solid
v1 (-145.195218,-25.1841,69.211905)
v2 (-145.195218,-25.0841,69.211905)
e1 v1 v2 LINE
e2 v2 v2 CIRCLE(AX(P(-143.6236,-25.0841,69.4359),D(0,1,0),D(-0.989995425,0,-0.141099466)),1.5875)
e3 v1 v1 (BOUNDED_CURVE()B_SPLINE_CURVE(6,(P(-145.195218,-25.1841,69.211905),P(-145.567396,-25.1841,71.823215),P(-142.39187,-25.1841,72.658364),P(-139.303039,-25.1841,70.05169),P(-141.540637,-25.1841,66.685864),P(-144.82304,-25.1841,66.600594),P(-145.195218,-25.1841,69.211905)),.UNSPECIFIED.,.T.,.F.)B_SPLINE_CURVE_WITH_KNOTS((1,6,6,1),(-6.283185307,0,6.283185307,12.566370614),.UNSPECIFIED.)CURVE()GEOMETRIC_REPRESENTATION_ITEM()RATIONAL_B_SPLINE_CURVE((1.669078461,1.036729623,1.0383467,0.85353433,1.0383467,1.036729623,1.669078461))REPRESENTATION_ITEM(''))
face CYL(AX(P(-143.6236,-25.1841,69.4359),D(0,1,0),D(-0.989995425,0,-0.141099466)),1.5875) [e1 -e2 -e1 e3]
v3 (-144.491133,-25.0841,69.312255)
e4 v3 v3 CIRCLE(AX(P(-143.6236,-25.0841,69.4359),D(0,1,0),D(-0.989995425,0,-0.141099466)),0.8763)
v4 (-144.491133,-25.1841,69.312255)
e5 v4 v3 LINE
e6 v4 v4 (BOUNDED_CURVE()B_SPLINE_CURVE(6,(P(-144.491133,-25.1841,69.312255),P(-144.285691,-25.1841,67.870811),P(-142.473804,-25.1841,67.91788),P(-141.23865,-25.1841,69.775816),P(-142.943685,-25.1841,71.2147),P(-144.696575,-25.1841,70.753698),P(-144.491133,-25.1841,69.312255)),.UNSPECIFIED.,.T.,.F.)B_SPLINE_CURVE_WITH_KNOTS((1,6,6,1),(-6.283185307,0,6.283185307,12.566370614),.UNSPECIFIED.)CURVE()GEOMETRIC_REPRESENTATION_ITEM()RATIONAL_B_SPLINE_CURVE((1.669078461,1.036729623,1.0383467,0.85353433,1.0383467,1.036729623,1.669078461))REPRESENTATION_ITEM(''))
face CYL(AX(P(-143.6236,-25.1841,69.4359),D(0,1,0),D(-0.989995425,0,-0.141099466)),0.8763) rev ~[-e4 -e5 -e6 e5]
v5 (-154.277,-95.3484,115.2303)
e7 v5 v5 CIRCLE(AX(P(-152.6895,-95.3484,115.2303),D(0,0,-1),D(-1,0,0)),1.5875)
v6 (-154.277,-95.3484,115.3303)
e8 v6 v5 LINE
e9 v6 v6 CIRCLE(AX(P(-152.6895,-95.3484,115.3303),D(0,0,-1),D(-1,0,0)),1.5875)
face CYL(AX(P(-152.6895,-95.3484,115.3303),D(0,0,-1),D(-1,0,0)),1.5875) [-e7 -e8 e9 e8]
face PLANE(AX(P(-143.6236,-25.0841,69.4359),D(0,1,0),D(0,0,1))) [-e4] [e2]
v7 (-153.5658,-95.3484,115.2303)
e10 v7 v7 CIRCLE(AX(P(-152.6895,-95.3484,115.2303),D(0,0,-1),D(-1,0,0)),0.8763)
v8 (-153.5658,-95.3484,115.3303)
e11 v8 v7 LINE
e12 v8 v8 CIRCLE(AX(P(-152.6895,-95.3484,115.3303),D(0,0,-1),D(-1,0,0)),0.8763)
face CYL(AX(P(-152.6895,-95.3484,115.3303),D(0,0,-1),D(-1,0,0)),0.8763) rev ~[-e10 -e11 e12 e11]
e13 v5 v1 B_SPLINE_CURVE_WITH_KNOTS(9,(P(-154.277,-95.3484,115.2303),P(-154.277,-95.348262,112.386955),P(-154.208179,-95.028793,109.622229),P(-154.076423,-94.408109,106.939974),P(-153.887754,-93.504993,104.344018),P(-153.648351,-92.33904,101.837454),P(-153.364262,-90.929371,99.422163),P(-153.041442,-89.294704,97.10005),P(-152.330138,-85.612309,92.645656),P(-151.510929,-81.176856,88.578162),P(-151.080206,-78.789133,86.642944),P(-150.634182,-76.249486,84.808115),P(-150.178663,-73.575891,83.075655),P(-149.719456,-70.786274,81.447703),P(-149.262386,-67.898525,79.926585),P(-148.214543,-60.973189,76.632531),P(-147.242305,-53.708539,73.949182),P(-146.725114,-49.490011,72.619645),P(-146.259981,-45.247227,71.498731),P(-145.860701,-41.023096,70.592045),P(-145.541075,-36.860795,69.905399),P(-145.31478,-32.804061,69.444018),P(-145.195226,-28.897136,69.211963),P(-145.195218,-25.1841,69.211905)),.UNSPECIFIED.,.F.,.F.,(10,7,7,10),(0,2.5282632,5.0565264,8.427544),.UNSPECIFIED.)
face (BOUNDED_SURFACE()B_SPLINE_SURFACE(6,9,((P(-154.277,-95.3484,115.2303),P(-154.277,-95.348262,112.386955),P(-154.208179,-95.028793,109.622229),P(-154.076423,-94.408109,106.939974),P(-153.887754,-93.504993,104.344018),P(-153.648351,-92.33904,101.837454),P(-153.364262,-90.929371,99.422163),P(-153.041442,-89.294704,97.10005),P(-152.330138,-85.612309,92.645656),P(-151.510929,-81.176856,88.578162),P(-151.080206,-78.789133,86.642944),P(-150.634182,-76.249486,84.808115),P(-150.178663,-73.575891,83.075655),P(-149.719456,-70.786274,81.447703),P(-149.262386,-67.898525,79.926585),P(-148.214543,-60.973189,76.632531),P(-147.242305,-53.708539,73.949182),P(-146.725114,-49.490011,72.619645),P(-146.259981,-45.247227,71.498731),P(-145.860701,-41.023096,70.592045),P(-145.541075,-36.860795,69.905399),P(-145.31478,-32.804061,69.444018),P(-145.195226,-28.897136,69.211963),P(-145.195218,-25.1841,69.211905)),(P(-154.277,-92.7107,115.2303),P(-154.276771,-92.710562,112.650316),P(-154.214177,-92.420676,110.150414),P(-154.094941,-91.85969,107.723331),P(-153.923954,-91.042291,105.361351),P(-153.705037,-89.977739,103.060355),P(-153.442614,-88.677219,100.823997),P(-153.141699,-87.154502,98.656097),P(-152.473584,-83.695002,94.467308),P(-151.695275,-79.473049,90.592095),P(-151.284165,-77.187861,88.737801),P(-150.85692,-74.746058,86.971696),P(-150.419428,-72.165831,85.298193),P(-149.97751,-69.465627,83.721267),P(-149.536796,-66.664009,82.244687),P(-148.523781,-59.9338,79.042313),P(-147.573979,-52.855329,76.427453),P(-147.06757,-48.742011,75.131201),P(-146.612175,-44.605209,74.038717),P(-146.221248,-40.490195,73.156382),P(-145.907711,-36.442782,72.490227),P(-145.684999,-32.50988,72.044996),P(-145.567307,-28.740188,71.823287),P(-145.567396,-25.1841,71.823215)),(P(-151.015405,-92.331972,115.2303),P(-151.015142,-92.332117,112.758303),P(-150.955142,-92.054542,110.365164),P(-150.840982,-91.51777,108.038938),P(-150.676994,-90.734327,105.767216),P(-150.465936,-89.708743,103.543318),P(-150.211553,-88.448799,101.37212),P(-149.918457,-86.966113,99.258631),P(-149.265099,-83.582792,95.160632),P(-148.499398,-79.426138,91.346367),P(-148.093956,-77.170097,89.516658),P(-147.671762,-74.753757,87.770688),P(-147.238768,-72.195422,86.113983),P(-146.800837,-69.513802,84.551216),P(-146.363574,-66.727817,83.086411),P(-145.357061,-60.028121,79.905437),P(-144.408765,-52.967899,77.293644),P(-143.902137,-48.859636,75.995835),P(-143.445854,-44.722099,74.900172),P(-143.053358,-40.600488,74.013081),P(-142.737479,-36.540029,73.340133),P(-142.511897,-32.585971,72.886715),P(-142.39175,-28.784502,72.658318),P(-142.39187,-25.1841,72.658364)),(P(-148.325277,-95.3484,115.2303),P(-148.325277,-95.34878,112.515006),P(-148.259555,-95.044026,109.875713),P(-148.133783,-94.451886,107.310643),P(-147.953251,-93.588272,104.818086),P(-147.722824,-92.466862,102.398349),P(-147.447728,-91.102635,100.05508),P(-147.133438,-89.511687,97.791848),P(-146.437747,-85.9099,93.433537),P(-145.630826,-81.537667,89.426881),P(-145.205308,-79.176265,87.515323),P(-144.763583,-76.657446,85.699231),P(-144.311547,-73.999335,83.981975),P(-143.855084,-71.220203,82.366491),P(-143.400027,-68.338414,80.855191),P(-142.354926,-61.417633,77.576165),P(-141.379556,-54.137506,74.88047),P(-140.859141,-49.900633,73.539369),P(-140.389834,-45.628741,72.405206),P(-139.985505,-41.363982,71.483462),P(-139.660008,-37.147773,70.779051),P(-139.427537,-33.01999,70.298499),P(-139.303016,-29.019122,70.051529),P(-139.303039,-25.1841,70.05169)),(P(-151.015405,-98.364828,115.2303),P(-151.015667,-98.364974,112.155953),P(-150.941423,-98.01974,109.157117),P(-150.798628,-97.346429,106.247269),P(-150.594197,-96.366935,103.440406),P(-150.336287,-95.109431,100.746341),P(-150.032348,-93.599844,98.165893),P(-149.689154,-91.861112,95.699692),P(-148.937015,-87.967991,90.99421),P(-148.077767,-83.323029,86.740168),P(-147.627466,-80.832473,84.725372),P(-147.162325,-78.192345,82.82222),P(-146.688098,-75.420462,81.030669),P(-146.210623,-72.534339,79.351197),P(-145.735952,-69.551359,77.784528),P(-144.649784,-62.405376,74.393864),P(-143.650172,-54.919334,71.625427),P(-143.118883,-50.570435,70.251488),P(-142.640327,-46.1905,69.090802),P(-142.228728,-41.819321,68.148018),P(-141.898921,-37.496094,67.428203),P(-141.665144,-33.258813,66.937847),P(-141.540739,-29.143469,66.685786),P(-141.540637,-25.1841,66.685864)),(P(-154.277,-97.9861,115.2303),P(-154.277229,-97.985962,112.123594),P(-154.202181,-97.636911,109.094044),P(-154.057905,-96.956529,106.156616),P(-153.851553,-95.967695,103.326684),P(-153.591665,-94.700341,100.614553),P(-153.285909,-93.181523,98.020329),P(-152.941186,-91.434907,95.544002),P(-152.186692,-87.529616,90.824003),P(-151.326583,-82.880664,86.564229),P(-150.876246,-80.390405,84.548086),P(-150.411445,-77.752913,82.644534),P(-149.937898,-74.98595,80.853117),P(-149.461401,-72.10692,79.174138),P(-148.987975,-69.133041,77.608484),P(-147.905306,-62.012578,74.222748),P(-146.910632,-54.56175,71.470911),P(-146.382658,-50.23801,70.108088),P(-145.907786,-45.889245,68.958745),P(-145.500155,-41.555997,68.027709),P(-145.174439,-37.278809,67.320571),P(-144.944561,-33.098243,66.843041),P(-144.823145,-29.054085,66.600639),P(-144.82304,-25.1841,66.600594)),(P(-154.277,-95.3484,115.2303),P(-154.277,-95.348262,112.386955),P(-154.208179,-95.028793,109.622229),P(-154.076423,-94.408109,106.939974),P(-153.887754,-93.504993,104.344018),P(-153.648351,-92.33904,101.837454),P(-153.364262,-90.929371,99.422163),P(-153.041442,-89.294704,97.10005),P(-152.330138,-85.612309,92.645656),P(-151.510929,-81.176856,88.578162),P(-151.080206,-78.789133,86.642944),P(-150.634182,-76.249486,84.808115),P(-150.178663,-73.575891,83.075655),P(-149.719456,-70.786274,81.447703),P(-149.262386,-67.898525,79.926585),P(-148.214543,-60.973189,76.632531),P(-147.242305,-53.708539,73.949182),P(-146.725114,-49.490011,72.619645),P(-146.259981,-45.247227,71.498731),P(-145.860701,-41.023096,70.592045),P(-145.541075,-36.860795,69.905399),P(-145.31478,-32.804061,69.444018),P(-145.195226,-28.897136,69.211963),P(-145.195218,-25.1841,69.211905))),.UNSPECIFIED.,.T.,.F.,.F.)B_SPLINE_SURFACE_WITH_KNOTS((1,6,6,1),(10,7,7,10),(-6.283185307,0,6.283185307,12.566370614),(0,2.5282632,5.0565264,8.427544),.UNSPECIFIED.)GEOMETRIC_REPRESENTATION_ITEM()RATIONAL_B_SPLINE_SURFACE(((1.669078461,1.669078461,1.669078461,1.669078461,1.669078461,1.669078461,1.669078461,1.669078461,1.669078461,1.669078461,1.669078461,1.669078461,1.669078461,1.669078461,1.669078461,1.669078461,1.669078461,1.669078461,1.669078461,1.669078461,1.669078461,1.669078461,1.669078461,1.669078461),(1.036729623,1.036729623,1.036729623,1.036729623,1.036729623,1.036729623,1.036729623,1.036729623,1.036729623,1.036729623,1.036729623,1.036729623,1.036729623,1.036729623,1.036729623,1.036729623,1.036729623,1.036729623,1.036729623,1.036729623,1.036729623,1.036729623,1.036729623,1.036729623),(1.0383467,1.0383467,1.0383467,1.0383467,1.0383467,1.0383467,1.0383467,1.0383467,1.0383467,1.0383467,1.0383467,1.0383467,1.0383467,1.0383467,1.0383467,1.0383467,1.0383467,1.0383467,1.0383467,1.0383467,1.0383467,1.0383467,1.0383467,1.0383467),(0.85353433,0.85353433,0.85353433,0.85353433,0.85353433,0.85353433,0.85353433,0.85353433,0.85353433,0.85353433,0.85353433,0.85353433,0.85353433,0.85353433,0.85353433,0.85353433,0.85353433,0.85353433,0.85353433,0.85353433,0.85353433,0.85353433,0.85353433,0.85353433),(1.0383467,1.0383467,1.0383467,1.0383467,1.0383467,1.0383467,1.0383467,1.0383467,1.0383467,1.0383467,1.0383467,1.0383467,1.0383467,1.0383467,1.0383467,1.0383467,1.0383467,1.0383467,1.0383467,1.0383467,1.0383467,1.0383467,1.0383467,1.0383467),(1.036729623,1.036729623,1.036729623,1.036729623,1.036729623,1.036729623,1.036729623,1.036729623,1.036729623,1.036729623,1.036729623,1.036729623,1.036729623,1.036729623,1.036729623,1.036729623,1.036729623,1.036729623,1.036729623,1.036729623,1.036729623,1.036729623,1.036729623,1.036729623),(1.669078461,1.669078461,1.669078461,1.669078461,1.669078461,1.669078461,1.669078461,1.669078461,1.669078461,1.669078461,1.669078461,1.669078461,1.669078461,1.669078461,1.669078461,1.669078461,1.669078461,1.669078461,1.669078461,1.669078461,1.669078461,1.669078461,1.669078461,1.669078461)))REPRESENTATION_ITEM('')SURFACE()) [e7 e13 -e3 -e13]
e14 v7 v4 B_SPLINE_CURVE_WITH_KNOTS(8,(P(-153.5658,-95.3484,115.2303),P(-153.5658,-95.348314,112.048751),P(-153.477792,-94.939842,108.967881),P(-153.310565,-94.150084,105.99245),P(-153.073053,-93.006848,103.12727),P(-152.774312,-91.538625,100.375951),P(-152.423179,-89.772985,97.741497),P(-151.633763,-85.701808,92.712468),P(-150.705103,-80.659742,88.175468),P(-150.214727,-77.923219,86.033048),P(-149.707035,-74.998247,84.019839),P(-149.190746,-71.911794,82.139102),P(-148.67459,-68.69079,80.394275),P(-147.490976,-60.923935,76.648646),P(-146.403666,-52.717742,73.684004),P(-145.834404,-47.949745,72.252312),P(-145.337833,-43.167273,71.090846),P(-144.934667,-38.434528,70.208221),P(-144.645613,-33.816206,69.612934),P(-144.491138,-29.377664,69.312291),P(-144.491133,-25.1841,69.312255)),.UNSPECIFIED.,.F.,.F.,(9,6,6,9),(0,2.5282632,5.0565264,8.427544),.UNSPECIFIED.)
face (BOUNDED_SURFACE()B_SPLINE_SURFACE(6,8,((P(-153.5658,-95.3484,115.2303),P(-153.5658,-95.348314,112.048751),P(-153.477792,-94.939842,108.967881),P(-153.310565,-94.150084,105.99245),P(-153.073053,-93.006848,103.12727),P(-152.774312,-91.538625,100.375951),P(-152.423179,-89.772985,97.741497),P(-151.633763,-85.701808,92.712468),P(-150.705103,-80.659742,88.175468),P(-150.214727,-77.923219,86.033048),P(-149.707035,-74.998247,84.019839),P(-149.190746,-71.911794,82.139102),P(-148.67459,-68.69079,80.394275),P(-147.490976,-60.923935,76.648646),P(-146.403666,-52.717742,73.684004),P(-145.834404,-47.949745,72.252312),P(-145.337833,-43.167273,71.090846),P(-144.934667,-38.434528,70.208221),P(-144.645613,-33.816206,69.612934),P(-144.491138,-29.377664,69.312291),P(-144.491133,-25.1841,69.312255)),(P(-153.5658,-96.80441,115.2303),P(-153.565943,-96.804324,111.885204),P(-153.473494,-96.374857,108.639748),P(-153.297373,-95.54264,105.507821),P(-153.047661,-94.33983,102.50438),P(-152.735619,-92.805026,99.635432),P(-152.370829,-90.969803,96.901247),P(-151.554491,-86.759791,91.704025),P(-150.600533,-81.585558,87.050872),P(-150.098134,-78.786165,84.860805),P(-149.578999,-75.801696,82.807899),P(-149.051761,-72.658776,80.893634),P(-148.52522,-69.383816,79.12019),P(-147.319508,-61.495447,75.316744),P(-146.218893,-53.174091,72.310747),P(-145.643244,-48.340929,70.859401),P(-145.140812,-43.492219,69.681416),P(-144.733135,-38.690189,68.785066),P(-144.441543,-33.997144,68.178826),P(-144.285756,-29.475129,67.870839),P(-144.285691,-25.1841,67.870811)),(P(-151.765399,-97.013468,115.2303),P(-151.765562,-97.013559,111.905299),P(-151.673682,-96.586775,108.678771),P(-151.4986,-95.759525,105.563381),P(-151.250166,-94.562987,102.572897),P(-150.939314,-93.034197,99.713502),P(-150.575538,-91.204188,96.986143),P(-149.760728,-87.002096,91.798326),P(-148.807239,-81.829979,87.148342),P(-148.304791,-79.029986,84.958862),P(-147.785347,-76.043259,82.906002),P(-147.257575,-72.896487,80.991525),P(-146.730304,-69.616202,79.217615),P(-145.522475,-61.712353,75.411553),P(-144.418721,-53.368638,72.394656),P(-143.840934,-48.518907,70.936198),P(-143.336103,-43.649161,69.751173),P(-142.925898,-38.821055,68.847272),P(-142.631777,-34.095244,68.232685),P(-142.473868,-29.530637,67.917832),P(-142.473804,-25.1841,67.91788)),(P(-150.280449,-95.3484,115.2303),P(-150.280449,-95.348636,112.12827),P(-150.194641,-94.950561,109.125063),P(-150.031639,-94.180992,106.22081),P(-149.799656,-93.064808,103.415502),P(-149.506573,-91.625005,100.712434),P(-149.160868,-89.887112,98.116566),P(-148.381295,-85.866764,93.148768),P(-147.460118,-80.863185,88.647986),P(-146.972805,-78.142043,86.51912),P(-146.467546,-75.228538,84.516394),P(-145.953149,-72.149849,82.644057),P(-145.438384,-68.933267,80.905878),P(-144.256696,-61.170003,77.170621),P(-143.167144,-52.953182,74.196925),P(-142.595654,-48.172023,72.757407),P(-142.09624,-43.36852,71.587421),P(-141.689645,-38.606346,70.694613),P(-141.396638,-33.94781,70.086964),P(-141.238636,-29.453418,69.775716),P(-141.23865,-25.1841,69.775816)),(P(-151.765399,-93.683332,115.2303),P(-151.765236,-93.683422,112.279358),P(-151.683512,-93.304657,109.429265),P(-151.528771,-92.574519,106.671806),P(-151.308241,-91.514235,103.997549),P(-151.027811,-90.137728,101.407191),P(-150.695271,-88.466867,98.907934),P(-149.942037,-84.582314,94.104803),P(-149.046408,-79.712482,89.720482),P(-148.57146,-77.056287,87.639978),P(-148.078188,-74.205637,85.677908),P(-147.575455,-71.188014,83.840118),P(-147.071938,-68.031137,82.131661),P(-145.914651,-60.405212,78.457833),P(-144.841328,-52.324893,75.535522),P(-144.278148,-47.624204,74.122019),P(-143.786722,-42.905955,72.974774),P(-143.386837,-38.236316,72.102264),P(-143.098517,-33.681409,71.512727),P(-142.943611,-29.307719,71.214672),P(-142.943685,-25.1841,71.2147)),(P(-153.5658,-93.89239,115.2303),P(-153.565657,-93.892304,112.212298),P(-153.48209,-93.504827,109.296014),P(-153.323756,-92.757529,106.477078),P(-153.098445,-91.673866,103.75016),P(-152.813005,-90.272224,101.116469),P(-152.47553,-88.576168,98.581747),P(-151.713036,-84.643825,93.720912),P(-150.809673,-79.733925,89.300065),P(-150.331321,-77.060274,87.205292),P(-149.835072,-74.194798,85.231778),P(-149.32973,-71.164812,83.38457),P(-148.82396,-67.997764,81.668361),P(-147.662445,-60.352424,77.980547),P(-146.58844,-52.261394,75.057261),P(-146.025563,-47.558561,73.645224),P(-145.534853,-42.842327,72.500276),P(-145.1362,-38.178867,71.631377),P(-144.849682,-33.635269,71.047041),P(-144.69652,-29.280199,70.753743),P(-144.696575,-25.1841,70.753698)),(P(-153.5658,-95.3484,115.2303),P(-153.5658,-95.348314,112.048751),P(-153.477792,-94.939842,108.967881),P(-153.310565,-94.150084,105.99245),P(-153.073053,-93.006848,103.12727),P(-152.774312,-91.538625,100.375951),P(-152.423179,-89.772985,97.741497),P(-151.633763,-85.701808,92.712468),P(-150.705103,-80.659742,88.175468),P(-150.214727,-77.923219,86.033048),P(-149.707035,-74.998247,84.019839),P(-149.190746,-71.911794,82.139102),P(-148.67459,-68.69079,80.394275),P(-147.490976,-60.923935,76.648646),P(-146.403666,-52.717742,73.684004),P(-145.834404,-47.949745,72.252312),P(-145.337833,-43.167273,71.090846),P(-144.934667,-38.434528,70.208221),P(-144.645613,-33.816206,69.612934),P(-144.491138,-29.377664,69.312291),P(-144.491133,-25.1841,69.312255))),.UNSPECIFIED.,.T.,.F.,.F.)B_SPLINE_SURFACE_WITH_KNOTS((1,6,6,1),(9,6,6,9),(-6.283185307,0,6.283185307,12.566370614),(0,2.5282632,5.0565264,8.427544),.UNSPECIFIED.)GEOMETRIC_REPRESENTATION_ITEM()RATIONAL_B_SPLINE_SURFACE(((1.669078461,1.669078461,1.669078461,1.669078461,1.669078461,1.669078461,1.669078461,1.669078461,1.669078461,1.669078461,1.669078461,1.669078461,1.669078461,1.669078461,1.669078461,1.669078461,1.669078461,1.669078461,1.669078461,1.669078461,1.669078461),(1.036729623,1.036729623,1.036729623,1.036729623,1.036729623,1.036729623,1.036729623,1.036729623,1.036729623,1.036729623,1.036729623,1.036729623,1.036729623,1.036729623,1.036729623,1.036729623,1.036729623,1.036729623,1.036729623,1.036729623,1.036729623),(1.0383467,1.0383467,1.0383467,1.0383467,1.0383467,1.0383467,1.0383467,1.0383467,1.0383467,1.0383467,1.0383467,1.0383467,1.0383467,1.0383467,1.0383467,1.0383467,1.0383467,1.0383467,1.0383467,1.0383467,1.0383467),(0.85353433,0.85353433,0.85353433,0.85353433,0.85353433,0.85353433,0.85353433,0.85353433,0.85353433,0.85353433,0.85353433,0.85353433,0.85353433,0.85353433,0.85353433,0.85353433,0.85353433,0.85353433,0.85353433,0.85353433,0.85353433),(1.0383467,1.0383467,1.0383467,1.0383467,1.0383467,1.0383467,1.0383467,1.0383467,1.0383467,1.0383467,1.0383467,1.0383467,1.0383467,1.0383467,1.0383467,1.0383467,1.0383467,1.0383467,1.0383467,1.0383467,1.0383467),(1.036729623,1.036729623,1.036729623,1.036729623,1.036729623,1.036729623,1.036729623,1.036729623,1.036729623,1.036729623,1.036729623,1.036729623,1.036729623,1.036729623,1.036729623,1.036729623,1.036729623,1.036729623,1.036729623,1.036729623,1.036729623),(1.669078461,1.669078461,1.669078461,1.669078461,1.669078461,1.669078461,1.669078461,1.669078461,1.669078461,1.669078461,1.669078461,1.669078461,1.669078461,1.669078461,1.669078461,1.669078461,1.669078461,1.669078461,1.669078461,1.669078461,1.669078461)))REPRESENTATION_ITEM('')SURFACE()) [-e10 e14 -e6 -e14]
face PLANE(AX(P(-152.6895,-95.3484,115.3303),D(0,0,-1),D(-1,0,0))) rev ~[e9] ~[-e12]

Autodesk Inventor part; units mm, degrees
ref_plane "YZ Plane" through (0, 0, 0) normal (1, 0, 0) x (0, 1, 0)
ref_plane "XZ Plane" through (0, 0, 0) normal (0, 1, 0) x (-1, 0, 0)
ref_plane "XY Plane" through (0, 0, 0) normal (0, 0, 1) x (1, 0, 0)
ref_plane "Work Plane3" through (-152.6895, -95.3484, 115.2303) normal (0, 0, -1) x (-1, 0, 0)
sketch "Sketch3" plane through (-152.6895, -95.3484, 115.2303) normal (0, 0, -1) x (-1, 0, 0)
  circle A0 centre (0, 0) radius 1.5875
  circle A1 centre (0, 0) radius 0.8763
sketch3d "3D Sketch1"
  line L0 (-152.6895, -95.3484, 115.3303) -> (-152.6895, -95.3484, 115.2303)
  spline S0 degree 3 poles (-152.6895, -95.3484, 115.2303) (-152.6895, -95.3484, 87.1384) (-143.6236, -53.2759, 69.4359) (-143.6236, -25.1841, 69.4359) knots 0 0 0 0 8.427544 8.427544 8.427544 8.427544
  line L1 (-143.6236, -25.1841, 69.4359) -> (-143.6236, -25.0841, 69.4359)
  dimension "d84" = 1
  dimension "d85" = 1
sweep "Sweep1" add profiles "Sketch3" path "3D Sketch1"
equation "\"OD\" = 3.175"
equation "\"t\" = 0.7112"
equation "\"L\" = PL"
equation "\"ID\" = 1.7526"
equation "\"PL\" = 91.7702"
equation "\"D\" = 12.7"
equation "\"Size_Designation\" = 1.2345"
equation "\"RPL\" = 92.075"
equation "\"OPL\" = 91.7702"
equation "\"ROPL\" = 92.075"
properties material "PVC-Piping"
